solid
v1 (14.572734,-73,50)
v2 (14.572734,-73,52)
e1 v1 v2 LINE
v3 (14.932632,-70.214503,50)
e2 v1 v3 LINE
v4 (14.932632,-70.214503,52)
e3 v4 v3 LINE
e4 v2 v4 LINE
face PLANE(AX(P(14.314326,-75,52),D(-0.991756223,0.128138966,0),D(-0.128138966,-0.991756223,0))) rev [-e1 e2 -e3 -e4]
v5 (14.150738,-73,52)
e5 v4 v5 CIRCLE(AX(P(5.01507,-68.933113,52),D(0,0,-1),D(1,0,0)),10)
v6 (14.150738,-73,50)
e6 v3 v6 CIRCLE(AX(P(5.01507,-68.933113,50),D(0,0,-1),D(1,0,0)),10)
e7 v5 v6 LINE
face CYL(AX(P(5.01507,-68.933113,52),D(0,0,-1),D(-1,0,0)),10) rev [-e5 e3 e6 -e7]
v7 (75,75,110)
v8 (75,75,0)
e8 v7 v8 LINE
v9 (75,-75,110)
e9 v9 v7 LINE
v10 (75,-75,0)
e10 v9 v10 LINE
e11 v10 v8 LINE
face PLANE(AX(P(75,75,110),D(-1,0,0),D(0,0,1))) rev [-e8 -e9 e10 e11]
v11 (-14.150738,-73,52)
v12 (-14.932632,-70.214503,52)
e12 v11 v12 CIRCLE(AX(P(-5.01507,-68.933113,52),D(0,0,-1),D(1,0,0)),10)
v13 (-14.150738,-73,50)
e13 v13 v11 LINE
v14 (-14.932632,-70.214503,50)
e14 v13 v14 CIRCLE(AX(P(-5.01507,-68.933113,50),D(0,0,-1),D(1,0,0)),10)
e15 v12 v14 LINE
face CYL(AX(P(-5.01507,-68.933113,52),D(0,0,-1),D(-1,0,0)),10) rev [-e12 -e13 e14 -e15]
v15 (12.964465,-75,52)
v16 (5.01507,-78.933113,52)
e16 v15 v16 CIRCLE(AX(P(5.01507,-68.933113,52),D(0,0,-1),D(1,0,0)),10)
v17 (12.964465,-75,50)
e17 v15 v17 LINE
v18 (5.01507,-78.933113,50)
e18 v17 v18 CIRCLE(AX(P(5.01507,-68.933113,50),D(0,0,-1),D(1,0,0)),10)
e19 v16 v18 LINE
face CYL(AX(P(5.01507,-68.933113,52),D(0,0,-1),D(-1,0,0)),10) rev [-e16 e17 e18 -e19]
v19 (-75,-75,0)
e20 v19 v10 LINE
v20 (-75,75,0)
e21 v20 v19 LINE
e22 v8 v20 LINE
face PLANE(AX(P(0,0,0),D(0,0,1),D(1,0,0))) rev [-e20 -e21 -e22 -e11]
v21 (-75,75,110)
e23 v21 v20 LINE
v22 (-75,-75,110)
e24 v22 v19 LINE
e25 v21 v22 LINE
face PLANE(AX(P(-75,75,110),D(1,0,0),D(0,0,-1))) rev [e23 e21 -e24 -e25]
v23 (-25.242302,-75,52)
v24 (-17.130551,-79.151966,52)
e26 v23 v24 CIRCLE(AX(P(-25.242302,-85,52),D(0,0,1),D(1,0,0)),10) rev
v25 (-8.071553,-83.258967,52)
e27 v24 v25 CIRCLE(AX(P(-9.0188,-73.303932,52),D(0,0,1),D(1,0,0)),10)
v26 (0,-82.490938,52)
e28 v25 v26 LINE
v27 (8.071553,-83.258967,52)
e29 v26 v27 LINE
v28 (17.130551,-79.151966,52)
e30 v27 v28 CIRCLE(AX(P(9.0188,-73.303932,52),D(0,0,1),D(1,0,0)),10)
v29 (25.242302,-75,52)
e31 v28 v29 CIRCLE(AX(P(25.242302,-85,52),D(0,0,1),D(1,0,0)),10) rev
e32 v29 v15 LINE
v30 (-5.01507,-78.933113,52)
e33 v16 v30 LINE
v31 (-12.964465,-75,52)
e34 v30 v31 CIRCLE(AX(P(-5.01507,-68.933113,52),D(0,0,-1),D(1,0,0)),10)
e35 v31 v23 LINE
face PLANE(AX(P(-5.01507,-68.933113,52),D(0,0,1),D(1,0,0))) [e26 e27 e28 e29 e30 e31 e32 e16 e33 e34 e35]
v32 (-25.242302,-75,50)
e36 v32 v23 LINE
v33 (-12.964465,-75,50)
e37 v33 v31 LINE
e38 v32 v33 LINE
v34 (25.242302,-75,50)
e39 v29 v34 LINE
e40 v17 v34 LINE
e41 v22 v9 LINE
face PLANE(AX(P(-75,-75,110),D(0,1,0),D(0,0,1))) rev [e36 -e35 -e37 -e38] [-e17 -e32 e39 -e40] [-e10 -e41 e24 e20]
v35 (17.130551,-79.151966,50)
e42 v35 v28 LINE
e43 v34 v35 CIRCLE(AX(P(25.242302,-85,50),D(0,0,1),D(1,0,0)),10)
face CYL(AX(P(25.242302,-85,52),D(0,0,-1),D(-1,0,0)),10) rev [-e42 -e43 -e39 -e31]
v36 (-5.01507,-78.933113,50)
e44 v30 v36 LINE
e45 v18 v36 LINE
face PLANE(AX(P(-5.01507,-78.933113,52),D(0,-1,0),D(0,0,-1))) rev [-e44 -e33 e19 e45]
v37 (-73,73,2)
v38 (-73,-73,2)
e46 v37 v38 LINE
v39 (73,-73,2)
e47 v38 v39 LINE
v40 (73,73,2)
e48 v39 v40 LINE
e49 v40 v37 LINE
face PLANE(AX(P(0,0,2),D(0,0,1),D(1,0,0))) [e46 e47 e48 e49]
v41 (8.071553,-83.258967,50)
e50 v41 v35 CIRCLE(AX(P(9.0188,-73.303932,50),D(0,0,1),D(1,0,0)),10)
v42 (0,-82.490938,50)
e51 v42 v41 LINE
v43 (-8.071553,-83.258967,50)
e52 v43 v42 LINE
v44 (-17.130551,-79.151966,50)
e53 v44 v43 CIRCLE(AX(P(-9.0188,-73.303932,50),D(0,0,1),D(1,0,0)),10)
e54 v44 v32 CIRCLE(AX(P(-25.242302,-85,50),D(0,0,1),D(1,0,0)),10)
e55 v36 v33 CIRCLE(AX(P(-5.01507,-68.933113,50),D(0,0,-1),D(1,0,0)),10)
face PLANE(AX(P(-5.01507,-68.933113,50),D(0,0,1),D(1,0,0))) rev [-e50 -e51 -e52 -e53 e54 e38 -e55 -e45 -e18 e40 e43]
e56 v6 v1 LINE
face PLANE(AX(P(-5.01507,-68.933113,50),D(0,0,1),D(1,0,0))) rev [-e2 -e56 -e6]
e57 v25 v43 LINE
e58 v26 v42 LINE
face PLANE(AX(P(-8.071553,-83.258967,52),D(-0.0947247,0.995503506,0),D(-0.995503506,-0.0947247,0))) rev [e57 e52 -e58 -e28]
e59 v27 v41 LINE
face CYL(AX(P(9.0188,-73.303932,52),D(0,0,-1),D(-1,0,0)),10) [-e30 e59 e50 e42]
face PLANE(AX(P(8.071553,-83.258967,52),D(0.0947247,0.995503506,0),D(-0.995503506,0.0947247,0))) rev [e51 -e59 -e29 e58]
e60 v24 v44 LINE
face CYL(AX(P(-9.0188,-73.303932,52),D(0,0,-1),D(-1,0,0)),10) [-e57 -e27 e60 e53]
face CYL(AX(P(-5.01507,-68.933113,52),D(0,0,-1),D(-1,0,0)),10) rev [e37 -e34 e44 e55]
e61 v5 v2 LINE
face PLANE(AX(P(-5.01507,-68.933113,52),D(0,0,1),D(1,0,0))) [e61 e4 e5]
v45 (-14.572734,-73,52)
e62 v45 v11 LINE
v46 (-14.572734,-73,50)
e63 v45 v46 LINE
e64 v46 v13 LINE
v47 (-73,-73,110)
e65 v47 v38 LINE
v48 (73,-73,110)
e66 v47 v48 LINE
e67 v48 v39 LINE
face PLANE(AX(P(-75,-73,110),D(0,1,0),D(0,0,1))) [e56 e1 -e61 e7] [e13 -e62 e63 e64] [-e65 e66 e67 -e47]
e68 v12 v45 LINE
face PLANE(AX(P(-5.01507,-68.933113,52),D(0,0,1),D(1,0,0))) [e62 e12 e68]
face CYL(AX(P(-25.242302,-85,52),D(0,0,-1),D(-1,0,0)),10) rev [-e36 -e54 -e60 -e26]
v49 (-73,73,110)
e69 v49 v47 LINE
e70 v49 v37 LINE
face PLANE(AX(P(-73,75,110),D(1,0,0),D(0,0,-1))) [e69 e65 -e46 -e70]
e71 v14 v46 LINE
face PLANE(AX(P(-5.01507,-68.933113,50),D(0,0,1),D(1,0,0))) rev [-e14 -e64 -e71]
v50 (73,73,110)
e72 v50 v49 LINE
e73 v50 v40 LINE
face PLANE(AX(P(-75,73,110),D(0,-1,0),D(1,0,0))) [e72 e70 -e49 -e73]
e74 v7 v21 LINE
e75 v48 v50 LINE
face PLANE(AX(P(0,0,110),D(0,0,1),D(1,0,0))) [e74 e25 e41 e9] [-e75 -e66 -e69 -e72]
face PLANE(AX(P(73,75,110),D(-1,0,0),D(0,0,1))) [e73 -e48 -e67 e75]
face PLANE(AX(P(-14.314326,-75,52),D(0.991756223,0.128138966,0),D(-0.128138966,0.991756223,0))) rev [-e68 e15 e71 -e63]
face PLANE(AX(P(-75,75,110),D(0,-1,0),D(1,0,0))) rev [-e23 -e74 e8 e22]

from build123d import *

# Parameters (mm, degrees)
SKETCH_1_W      = 150
SKETCH_1_H      = 150
EXTRUDE_1_DEPTH = 110
SHELL_1_T       = -2
EXTRUDE_START   = -60
EXTRUDE_2_DEPTH = 2
FILLET_1_R      = 10


with BuildPart() as part:
    # 草图1 → 凸台-拉伸1 (new body)
    with BuildSketch(Plane.XY):
        Rectangle(SKETCH_1_W, SKETCH_1_H)
    extrude(amount=EXTRUDE_1_DEPTH)

    # 抽壳1
    shell_1_openings = [part.faces().sort_by_distance(p)[0] for p in [
        (0, 0, 110),
    ]]
    offset(amount=SHELL_1_T, openings=shell_1_openings, kind=Kind.INTERSECTION)

    # 草图2 → 凸台-拉伸2 (add)
    with BuildSketch(Plane.XY.offset(110).offset(EXTRUDE_START)):
        with BuildLine():
            Line((-19.944653056, -75), (-17.301604129, -78.907070498))
            ThreePointArc((-17.301604129, -78.907070498), (-13.28346315, -82.348966768), (-8.071553148, -83.258967309))
            Line((-8.071553148, -83.258967309), (0, -82.490938419))
            Line((0, -82.490938419), (8.071553148, -83.258967309))
            ThreePointArc((8.071553148, -83.258967309), (13.28346315, -82.348966768), (17.301604129, -78.907070498))
            Line((17.301604129, -78.907070498), (19.944653056, -75))
            Line((19.944653056, -75), (14.314326214, -75))
            Line((14.314326214, -75), (14.932632038, -70.214502915))
            ThreePointArc((14.932632038, -70.214502915), (11.617573252, -76.443569186), (5.01506981, -78.933113254))
            Line((5.01506981, -78.933113254), (-5.01506981, -78.933113254))
            ThreePointArc((-5.01506981, -78.933113254), (-11.617573252, -76.443569186), (-14.932632038, -70.214502915))
            Line((-14.932632038, -70.214502915), (-14.314326214, -75))
            Line((-14.314326214, -75), (-19.944653056, -75))
        make_face()
    extrude(amount=EXTRUDE_2_DEPTH)

    # 圆角1
    # the kernel refuses this fillet: 10 mm, written as the material it adds along each edge
    with BuildSketch(Plane(origin=(19.944653056, -75, 50), x_dir=(1, 0, 0), z_dir=(0, 0, 1))) as fillet_1_piece_1:
        with BuildLine():
            CenterArc((5.297648539, -10), FILLET_1_R, 90, 54.21089853)
            Line((-2.814102182, -4.151966123), (-3.625277254, -3.567162735))
            ThreePointArc((-3.625277254, -3.567162735), (-3.471329325, -3.346756673), (-0.828280398, 0.560313825))
            Line((-0.828280398, 0.560313825), (0, 1))
            Line((0, 1), (5.297648539, 1))
            Line((5.297648539, 1), (5.297648539, 0))
        make_face()
    extrude(amount=2)
    with BuildSketch(Plane(origin=(-19.944653056, -75, 50), x_dir=(-1, 0, 0), z_dir=(0, 0, 1))) as fillet_1_piece_2:
        with BuildLine():
            CenterArc((5.297648539, 10), FILLET_1_R, 215.78910147, 54.21089853)
            Line((-2.814102182, 4.151966123), (-3.625277254, 3.567162735))
            ThreePointArc((-3.625277254, 3.567162735), (-3.471329325, 3.346756673), (-0.828280398, -0.560313825))
            Line((-0.828280398, -0.560313825), (0, -1))
            Line((0, -1), (5.297648539, -1))
            Line((5.297648539, -1), (5.297648539, 0))
        make_face()
    extrude(amount=2)


solid = part.part
